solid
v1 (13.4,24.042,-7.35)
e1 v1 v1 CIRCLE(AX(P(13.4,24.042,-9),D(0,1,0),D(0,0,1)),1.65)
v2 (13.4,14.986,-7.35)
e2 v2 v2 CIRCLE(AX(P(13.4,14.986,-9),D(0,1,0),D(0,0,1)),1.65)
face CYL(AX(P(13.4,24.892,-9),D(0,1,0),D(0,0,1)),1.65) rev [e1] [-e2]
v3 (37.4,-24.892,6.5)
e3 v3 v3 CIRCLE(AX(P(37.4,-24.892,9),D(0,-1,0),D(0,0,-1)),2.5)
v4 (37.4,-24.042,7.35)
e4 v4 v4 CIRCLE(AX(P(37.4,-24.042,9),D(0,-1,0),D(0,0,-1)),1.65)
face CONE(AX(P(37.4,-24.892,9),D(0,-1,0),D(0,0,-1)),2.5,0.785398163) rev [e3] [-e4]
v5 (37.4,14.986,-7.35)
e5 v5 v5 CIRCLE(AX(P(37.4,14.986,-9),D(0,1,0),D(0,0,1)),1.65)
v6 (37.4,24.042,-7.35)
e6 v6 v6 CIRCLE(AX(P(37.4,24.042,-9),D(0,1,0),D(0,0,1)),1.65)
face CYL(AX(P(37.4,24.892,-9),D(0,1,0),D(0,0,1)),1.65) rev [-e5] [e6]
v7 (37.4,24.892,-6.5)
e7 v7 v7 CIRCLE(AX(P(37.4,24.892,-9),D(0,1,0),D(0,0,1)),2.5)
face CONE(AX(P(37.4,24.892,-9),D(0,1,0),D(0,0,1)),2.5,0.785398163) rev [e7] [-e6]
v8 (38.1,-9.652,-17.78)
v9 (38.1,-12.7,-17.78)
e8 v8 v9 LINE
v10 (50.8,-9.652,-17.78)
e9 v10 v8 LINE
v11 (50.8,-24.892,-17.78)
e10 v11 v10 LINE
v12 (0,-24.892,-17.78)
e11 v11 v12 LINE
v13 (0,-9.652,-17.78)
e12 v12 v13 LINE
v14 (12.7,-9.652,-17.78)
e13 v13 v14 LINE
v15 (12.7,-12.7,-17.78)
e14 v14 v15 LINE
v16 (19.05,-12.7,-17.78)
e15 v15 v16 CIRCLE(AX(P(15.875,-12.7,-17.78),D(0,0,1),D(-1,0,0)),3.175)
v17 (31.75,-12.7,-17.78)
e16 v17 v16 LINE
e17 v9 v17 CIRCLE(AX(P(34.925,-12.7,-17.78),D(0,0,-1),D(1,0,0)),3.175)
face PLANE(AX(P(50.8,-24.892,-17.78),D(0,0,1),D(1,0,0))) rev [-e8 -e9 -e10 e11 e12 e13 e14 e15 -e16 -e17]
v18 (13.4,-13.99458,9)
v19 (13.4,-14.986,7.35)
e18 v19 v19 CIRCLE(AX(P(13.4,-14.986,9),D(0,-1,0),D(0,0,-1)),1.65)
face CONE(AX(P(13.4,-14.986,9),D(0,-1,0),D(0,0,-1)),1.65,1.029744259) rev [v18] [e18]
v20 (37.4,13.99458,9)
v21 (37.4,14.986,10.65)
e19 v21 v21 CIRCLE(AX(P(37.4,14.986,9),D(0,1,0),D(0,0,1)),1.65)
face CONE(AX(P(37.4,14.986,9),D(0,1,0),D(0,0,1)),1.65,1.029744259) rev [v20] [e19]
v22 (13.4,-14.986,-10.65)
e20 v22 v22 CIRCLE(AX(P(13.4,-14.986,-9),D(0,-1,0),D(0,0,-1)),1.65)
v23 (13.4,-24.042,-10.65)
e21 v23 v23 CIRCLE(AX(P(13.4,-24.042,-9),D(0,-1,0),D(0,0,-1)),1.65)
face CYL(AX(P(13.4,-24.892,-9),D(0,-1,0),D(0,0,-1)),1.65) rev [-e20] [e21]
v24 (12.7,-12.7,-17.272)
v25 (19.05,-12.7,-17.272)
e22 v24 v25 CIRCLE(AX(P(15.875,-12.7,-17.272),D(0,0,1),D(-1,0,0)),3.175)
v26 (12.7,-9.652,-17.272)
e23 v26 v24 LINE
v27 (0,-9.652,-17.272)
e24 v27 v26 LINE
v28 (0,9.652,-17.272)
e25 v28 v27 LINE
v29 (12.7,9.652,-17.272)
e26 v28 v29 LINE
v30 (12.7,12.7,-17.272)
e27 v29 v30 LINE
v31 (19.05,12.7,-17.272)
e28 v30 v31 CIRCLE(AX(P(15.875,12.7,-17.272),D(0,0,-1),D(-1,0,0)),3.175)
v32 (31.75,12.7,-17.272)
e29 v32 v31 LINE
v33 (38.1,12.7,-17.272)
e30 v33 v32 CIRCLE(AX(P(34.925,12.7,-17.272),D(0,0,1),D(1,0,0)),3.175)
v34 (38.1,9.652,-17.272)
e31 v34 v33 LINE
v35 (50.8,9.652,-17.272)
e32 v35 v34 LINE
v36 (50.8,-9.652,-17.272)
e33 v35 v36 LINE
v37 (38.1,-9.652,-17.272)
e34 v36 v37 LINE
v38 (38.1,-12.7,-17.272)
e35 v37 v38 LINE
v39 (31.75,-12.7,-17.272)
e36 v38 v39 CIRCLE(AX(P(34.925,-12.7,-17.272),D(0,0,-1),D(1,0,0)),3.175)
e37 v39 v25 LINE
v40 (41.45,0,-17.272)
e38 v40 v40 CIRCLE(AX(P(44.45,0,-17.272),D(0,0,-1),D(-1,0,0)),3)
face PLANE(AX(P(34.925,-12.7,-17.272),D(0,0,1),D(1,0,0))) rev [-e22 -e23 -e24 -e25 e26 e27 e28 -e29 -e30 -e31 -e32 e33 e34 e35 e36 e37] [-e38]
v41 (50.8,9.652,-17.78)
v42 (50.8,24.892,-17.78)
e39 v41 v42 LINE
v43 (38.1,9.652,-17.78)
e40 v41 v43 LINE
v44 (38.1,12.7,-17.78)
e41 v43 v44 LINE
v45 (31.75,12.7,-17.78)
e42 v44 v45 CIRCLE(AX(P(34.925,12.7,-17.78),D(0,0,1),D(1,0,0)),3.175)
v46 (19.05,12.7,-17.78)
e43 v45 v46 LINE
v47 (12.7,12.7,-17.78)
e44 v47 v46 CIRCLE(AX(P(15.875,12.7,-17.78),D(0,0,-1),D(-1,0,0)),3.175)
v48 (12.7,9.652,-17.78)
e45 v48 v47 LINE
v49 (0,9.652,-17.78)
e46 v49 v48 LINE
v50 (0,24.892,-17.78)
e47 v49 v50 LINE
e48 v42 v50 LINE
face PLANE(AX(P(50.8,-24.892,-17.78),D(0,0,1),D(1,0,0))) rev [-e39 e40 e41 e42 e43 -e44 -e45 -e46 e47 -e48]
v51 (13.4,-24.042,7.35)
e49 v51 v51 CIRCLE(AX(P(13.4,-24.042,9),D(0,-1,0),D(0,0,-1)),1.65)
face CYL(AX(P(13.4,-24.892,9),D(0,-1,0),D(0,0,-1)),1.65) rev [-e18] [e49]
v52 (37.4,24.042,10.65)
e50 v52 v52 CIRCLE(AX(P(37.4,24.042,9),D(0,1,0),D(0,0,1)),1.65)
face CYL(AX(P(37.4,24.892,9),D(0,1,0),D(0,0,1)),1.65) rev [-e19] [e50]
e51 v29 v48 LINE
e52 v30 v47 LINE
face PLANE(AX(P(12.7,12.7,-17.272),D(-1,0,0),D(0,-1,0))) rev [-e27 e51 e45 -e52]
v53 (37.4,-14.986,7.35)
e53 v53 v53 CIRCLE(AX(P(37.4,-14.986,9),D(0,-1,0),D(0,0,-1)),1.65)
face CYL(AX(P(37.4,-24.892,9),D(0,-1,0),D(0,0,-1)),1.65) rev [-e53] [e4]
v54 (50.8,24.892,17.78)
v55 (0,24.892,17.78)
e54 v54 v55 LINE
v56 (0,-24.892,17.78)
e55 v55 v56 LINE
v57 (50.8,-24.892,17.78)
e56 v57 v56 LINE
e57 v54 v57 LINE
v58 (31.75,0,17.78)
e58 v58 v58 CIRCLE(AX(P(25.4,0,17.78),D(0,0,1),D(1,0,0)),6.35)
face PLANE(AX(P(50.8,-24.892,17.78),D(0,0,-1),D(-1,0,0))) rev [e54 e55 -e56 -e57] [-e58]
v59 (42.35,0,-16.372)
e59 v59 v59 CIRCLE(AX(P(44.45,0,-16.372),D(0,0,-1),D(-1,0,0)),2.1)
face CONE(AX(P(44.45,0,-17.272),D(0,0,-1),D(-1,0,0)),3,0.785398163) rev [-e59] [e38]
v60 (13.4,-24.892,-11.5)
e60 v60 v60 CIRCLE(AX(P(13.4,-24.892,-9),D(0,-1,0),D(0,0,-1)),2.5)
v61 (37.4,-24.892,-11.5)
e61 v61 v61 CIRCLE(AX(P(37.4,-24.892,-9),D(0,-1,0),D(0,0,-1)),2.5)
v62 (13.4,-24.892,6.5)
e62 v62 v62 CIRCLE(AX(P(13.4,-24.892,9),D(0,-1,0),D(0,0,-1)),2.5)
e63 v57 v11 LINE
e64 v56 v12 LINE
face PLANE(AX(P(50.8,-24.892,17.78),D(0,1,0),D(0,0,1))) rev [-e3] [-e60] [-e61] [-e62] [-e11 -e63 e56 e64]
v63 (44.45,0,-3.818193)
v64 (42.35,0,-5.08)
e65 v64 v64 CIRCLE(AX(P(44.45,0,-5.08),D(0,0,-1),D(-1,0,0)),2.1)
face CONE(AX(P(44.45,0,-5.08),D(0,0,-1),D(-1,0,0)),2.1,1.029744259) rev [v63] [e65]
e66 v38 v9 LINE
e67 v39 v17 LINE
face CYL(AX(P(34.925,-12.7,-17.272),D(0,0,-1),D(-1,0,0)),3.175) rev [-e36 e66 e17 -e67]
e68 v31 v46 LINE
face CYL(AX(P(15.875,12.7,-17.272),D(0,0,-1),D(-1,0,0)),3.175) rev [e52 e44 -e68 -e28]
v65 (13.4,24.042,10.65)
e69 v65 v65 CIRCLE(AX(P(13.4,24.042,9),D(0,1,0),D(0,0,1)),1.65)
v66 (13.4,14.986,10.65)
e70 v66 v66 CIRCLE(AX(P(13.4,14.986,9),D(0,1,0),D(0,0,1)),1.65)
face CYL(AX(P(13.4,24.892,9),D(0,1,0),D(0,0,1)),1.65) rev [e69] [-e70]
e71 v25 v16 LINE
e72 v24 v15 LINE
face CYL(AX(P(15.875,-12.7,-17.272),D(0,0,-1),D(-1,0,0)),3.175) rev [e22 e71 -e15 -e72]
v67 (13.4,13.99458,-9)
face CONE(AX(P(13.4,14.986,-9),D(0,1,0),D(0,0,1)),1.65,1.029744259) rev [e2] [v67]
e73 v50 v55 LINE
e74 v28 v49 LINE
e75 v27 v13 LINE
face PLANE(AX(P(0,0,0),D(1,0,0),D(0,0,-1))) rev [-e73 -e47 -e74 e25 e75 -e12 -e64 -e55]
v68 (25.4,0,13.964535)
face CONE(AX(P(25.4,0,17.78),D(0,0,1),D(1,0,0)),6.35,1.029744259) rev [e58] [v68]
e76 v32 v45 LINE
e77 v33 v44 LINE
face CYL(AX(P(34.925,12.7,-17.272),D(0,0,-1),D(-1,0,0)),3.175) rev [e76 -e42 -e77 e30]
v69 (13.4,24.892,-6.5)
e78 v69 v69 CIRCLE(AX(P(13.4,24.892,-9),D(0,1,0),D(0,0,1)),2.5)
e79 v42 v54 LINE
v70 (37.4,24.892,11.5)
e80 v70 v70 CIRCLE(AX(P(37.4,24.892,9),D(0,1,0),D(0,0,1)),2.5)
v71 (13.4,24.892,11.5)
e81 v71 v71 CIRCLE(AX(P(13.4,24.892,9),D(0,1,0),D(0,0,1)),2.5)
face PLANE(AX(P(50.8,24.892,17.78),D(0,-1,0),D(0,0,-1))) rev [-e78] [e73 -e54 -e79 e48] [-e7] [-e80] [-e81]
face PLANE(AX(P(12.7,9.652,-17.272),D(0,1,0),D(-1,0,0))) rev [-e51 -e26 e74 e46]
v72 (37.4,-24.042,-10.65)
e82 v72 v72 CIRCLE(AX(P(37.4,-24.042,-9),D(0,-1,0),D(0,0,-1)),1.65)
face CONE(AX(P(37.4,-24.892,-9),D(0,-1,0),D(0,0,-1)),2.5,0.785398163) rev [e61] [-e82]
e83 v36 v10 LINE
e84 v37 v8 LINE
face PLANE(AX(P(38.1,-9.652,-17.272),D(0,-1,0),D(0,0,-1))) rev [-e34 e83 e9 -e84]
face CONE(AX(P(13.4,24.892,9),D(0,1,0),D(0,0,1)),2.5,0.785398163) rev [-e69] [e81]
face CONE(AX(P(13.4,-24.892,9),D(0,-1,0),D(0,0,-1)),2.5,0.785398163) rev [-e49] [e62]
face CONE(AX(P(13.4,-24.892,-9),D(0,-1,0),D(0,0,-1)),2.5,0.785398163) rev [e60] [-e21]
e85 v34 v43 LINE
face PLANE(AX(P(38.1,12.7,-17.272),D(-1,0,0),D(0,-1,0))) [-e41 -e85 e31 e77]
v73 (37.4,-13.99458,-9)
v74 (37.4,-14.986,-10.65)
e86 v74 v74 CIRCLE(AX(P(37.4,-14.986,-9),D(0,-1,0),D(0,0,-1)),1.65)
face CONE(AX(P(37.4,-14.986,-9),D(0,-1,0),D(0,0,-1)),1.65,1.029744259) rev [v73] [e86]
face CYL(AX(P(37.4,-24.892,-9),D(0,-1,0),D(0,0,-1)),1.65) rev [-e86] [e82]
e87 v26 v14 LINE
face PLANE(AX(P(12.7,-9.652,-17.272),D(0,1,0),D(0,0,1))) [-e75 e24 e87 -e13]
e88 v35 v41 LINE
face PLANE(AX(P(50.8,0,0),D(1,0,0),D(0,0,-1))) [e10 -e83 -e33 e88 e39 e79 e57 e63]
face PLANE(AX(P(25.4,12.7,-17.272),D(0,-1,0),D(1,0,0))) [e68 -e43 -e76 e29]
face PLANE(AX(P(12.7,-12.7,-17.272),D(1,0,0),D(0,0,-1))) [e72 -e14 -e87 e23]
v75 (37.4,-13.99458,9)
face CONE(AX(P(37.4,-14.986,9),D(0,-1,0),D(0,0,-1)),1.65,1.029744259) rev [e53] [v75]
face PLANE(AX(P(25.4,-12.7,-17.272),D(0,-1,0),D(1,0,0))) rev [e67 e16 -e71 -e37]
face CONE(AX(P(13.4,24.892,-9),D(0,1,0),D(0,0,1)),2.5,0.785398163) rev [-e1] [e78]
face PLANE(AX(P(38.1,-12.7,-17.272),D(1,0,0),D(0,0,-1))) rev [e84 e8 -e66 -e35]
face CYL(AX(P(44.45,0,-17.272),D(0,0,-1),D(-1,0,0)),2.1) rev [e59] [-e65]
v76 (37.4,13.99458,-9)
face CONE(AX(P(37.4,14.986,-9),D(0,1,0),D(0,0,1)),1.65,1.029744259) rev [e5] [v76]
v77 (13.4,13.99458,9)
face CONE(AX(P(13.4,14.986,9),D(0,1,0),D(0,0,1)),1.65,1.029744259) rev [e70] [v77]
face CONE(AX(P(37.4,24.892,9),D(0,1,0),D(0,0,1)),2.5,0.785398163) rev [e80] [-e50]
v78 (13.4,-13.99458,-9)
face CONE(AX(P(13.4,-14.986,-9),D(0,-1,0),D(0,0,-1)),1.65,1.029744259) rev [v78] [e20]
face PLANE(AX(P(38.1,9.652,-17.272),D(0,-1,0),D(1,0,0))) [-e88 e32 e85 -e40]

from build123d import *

# Parameters (mm, degrees)
SKETCH1_W                       = 49.784
SKETCH1_H                       = 35.56
BOSS_EXTRUDE1_DEPTH             = 50.8
M4X0_7_TAPPED_HOLE1_AT_2_COUNT  = 2
M4X0_7_TAPPED_HOLE1_AT_2_PITCH  = 30
M4X0_7_TAPPED_HOLE1_AT_3_COUNT  = 2
M4X0_7_TAPPED_HOLE1_AT_3_PITCH  = 18
M4X0_7_TAPPED_HOLE1_AT_4_COUNT  = 2
M4X0_7_TAPPED_HOLE1_AT_4_PITCH  = 24
CUT_EXTRUDE2_DEPTH              = 0.508
MIRROR2_START                   = -17.78
MIRROR2_DEPTH                   = 0.508
M5X0_8_TAPPED_HOLE1_D           = 4.2
M5X0_8_TAPPED_HOLE1_DEPTH       = 12.192
M5X0_8_TAPPED_HOLE1_CSINK_D     = 6
M5X0_8_TAPPED_HOLE1_CSINK_ANGLE = 90
M5X0_8_TAPPED_HOLE1_TIP         = 1.2618073


# Read off the part's stored shape, not the designer's step: Mirror2
with BuildPart() as part:
    # Sketch1 → Boss-Extrude1 (new body)
    with BuildSketch(Plane.YZ):
        Rectangle(SKETCH1_W, SKETCH1_H)
    extrude(amount=BOSS_EXTRUDE1_DEPTH)

    # Sketch3 → M4x0.7 Tapped Hole1 (revolve, cut)
    with BuildSketch(Plane(origin=(13.4, -24.892, -9), x_dir=(0, 0, -1), z_dir=(1, 0, 0))):
        Polygon((0, 0), (0, 10.897420021), (1.65, 9.906), (1.65, 0.85), (2.5, 0), align=None)
    m4x0_7_tapped_hole1 = revolve(axis=Axis((13.4, -31.242, -9), (0, 1, 0)), mode=Mode.SUBTRACT)

    # M4x0.7 Tapped Hole1 at 2: M4x0.7 Tapped Hole1 ×2
    with Locations(*[Vector(0.8000000000000002, 0, 0.5999999999999998) * (i * M4X0_7_TAPPED_HOLE1_AT_2_PITCH) for i in range(1, M4X0_7_TAPPED_HOLE1_AT_2_COUNT)]):
        add(m4x0_7_tapped_hole1, mode=Mode.SUBTRACT)

    # M4x0.7 Tapped Hole1 at 3: M4x0.7 Tapped Hole1 ×2
    with Locations(*[(0, 0, i * M4X0_7_TAPPED_HOLE1_AT_3_PITCH) for i in range(1, M4X0_7_TAPPED_HOLE1_AT_3_COUNT)]):
        add(m4x0_7_tapped_hole1, mode=Mode.SUBTRACT)

    # M4x0.7 Tapped Hole1 at 4: M4x0.7 Tapped Hole1 ×2
    with Locations(*[(i * M4X0_7_TAPPED_HOLE1_AT_4_PITCH, 0, 0) for i in range(1, M4X0_7_TAPPED_HOLE1_AT_4_COUNT)]):
        add(m4x0_7_tapped_hole1, mode=Mode.SUBTRACT)

    # Mirror1: M4x0.7 Tapped Hole1 across plane
    add(m4x0_7_tapped_hole1.mirror(Plane.ZX), mode=Mode.SUBTRACT)

    # Mirror1 copy 1 sketch → Mirror1 copy 1 (revolve, cut)
    with BuildSketch(Plane(origin=(37.4, 24.892, 9), x_dir=(0, 0, -1), z_dir=(1, 0, 0))):
        Polygon((0, 0), (0, -10.897420021), (1.65, -9.906), (1.65, -0.85), (2.5, 0), align=None)
    revolve(axis=Axis((37.4, 31.242, 9), (0, 1, 0)), mode=Mode.SUBTRACT)

    # Mirror1 copy 2 sketch → Mirror1 copy 2 (revolve, cut)
    with BuildSketch(Plane(origin=(13.4, 24.892, 9), x_dir=(0, 0, -1), z_dir=(1, 0, 0))):
        Polygon((0, 0), (0, -10.897420021), (1.65, -9.906), (1.65, -0.85), (2.5, 0), align=None)
    revolve(axis=Axis((13.4, 31.242, 9), (0, 1, 0)), mode=Mode.SUBTRACT)

    # Mirror1 copy 3 sketch → Mirror1 copy 3 (revolve, cut)
    with BuildSketch(Plane(origin=(37.4, 24.892, -9), x_dir=(0, 0, -1), z_dir=(1, 0, 0))):
        Polygon((0, 0), (0, -10.897420021), (1.65, -9.906), (1.65, -0.85), (2.5, 0), align=None)
    revolve(axis=Axis((37.4, 31.242, -9), (0, 1, 0)), mode=Mode.SUBTRACT)

    # Sketch5 → Cut-Revolve1 (revolve, cut)
    with BuildSketch(Plane(origin=(0, 0, 0), x_dir=(-1, 0, 0), z_dir=(0, 1, 0))):
        Polygon((-25.4, 17.78), (-25.4, 13.964535069), (-31.75, 17.78), align=None)
    revolve(axis=Axis((25.4, 0, 17.78), (0, 0, -1)), mode=Mode.SUBTRACT)

    # Sketch9 → Cut-Extrude2 (cut)
    with BuildSketch(Plane(origin=(0, 0, -17.78), x_dir=(1, 0, 0), z_dir=(0, 0, -1))):
        with BuildLine():
            Line((25.4, 12.7), (31.75, 12.7))
            ThreePointArc((31.75, 12.7), (34.925, 15.875), (38.1, 12.7))
            Line((38.1, 12.7), (38.1, 9.652))
            Line((38.1, 9.652), (50.8, 9.652))
            Line((50.8, 9.652), (50.8, 0))
            Line((50.8, 0), (25.4, 0))
            Line((25.4, 0), (25.4, 12.7))
        make_face()
    extrude(amount=-CUT_EXTRUDE2_DEPTH, mode=Mode.SUBTRACT)

    # Mirror2 outline → Mirror2 (cut)
    with BuildSketch(Plane.XY.offset(MIRROR2_START)):
        with BuildLine():
            Line((38.1, 9.652), (38.1, 12.7))
            ThreePointArc((38.1, 12.7), (34.925, 15.875), (31.75, 12.7))
            Line((31.75, 12.7), (19.05, 12.7))
            ThreePointArc((19.05, 12.7), (15.875, 15.875), (12.7, 12.7))
            Line((12.7, 12.7), (12.7, 9.652))
            Line((12.7, 9.652), (0, 9.652))
            Line((0, 9.652), (0, -9.652))
            Line((0, -9.652), (12.7, -9.652))
            Line((12.7, -9.652), (12.7, -12.7))
            ThreePointArc((12.7, -12.7), (15.875, -15.875), (19.05, -12.7))
            Line((19.05, -12.7), (25.4, -12.7))
            Line((25.4, -12.7), (25.4, 0))
            Line((25.4, 0), (50.8, 0))
            Line((50.8, 0), (50.8, 9.652))
            Line((50.8, 9.652), (38.1, 9.652))
        make_face()
    extrude(amount=MIRROR2_DEPTH, mode=Mode.SUBTRACT)

    # M5x0.8 Tapped Hole1
    with Locations(Plane(origin=(0, 0, -17.272), x_dir=(1, 0, 0), z_dir=(0, 0, -1))):
        with Locations((44.45, 0)):
            CounterSinkHole(M5X0_8_TAPPED_HOLE1_D / 2, M5X0_8_TAPPED_HOLE1_CSINK_D / 2, depth=M5X0_8_TAPPED_HOLE1_DEPTH, counter_sink_angle=M5X0_8_TAPPED_HOLE1_CSINK_ANGLE)
            with Locations((0, 0, -(M5X0_8_TAPPED_HOLE1_DEPTH + M5X0_8_TAPPED_HOLE1_TIP / 2))):  # 118° drill point
                Cone(0, M5X0_8_TAPPED_HOLE1_D / 2, M5X0_8_TAPPED_HOLE1_TIP, mode=Mode.SUBTRACT)


solid = part.part
